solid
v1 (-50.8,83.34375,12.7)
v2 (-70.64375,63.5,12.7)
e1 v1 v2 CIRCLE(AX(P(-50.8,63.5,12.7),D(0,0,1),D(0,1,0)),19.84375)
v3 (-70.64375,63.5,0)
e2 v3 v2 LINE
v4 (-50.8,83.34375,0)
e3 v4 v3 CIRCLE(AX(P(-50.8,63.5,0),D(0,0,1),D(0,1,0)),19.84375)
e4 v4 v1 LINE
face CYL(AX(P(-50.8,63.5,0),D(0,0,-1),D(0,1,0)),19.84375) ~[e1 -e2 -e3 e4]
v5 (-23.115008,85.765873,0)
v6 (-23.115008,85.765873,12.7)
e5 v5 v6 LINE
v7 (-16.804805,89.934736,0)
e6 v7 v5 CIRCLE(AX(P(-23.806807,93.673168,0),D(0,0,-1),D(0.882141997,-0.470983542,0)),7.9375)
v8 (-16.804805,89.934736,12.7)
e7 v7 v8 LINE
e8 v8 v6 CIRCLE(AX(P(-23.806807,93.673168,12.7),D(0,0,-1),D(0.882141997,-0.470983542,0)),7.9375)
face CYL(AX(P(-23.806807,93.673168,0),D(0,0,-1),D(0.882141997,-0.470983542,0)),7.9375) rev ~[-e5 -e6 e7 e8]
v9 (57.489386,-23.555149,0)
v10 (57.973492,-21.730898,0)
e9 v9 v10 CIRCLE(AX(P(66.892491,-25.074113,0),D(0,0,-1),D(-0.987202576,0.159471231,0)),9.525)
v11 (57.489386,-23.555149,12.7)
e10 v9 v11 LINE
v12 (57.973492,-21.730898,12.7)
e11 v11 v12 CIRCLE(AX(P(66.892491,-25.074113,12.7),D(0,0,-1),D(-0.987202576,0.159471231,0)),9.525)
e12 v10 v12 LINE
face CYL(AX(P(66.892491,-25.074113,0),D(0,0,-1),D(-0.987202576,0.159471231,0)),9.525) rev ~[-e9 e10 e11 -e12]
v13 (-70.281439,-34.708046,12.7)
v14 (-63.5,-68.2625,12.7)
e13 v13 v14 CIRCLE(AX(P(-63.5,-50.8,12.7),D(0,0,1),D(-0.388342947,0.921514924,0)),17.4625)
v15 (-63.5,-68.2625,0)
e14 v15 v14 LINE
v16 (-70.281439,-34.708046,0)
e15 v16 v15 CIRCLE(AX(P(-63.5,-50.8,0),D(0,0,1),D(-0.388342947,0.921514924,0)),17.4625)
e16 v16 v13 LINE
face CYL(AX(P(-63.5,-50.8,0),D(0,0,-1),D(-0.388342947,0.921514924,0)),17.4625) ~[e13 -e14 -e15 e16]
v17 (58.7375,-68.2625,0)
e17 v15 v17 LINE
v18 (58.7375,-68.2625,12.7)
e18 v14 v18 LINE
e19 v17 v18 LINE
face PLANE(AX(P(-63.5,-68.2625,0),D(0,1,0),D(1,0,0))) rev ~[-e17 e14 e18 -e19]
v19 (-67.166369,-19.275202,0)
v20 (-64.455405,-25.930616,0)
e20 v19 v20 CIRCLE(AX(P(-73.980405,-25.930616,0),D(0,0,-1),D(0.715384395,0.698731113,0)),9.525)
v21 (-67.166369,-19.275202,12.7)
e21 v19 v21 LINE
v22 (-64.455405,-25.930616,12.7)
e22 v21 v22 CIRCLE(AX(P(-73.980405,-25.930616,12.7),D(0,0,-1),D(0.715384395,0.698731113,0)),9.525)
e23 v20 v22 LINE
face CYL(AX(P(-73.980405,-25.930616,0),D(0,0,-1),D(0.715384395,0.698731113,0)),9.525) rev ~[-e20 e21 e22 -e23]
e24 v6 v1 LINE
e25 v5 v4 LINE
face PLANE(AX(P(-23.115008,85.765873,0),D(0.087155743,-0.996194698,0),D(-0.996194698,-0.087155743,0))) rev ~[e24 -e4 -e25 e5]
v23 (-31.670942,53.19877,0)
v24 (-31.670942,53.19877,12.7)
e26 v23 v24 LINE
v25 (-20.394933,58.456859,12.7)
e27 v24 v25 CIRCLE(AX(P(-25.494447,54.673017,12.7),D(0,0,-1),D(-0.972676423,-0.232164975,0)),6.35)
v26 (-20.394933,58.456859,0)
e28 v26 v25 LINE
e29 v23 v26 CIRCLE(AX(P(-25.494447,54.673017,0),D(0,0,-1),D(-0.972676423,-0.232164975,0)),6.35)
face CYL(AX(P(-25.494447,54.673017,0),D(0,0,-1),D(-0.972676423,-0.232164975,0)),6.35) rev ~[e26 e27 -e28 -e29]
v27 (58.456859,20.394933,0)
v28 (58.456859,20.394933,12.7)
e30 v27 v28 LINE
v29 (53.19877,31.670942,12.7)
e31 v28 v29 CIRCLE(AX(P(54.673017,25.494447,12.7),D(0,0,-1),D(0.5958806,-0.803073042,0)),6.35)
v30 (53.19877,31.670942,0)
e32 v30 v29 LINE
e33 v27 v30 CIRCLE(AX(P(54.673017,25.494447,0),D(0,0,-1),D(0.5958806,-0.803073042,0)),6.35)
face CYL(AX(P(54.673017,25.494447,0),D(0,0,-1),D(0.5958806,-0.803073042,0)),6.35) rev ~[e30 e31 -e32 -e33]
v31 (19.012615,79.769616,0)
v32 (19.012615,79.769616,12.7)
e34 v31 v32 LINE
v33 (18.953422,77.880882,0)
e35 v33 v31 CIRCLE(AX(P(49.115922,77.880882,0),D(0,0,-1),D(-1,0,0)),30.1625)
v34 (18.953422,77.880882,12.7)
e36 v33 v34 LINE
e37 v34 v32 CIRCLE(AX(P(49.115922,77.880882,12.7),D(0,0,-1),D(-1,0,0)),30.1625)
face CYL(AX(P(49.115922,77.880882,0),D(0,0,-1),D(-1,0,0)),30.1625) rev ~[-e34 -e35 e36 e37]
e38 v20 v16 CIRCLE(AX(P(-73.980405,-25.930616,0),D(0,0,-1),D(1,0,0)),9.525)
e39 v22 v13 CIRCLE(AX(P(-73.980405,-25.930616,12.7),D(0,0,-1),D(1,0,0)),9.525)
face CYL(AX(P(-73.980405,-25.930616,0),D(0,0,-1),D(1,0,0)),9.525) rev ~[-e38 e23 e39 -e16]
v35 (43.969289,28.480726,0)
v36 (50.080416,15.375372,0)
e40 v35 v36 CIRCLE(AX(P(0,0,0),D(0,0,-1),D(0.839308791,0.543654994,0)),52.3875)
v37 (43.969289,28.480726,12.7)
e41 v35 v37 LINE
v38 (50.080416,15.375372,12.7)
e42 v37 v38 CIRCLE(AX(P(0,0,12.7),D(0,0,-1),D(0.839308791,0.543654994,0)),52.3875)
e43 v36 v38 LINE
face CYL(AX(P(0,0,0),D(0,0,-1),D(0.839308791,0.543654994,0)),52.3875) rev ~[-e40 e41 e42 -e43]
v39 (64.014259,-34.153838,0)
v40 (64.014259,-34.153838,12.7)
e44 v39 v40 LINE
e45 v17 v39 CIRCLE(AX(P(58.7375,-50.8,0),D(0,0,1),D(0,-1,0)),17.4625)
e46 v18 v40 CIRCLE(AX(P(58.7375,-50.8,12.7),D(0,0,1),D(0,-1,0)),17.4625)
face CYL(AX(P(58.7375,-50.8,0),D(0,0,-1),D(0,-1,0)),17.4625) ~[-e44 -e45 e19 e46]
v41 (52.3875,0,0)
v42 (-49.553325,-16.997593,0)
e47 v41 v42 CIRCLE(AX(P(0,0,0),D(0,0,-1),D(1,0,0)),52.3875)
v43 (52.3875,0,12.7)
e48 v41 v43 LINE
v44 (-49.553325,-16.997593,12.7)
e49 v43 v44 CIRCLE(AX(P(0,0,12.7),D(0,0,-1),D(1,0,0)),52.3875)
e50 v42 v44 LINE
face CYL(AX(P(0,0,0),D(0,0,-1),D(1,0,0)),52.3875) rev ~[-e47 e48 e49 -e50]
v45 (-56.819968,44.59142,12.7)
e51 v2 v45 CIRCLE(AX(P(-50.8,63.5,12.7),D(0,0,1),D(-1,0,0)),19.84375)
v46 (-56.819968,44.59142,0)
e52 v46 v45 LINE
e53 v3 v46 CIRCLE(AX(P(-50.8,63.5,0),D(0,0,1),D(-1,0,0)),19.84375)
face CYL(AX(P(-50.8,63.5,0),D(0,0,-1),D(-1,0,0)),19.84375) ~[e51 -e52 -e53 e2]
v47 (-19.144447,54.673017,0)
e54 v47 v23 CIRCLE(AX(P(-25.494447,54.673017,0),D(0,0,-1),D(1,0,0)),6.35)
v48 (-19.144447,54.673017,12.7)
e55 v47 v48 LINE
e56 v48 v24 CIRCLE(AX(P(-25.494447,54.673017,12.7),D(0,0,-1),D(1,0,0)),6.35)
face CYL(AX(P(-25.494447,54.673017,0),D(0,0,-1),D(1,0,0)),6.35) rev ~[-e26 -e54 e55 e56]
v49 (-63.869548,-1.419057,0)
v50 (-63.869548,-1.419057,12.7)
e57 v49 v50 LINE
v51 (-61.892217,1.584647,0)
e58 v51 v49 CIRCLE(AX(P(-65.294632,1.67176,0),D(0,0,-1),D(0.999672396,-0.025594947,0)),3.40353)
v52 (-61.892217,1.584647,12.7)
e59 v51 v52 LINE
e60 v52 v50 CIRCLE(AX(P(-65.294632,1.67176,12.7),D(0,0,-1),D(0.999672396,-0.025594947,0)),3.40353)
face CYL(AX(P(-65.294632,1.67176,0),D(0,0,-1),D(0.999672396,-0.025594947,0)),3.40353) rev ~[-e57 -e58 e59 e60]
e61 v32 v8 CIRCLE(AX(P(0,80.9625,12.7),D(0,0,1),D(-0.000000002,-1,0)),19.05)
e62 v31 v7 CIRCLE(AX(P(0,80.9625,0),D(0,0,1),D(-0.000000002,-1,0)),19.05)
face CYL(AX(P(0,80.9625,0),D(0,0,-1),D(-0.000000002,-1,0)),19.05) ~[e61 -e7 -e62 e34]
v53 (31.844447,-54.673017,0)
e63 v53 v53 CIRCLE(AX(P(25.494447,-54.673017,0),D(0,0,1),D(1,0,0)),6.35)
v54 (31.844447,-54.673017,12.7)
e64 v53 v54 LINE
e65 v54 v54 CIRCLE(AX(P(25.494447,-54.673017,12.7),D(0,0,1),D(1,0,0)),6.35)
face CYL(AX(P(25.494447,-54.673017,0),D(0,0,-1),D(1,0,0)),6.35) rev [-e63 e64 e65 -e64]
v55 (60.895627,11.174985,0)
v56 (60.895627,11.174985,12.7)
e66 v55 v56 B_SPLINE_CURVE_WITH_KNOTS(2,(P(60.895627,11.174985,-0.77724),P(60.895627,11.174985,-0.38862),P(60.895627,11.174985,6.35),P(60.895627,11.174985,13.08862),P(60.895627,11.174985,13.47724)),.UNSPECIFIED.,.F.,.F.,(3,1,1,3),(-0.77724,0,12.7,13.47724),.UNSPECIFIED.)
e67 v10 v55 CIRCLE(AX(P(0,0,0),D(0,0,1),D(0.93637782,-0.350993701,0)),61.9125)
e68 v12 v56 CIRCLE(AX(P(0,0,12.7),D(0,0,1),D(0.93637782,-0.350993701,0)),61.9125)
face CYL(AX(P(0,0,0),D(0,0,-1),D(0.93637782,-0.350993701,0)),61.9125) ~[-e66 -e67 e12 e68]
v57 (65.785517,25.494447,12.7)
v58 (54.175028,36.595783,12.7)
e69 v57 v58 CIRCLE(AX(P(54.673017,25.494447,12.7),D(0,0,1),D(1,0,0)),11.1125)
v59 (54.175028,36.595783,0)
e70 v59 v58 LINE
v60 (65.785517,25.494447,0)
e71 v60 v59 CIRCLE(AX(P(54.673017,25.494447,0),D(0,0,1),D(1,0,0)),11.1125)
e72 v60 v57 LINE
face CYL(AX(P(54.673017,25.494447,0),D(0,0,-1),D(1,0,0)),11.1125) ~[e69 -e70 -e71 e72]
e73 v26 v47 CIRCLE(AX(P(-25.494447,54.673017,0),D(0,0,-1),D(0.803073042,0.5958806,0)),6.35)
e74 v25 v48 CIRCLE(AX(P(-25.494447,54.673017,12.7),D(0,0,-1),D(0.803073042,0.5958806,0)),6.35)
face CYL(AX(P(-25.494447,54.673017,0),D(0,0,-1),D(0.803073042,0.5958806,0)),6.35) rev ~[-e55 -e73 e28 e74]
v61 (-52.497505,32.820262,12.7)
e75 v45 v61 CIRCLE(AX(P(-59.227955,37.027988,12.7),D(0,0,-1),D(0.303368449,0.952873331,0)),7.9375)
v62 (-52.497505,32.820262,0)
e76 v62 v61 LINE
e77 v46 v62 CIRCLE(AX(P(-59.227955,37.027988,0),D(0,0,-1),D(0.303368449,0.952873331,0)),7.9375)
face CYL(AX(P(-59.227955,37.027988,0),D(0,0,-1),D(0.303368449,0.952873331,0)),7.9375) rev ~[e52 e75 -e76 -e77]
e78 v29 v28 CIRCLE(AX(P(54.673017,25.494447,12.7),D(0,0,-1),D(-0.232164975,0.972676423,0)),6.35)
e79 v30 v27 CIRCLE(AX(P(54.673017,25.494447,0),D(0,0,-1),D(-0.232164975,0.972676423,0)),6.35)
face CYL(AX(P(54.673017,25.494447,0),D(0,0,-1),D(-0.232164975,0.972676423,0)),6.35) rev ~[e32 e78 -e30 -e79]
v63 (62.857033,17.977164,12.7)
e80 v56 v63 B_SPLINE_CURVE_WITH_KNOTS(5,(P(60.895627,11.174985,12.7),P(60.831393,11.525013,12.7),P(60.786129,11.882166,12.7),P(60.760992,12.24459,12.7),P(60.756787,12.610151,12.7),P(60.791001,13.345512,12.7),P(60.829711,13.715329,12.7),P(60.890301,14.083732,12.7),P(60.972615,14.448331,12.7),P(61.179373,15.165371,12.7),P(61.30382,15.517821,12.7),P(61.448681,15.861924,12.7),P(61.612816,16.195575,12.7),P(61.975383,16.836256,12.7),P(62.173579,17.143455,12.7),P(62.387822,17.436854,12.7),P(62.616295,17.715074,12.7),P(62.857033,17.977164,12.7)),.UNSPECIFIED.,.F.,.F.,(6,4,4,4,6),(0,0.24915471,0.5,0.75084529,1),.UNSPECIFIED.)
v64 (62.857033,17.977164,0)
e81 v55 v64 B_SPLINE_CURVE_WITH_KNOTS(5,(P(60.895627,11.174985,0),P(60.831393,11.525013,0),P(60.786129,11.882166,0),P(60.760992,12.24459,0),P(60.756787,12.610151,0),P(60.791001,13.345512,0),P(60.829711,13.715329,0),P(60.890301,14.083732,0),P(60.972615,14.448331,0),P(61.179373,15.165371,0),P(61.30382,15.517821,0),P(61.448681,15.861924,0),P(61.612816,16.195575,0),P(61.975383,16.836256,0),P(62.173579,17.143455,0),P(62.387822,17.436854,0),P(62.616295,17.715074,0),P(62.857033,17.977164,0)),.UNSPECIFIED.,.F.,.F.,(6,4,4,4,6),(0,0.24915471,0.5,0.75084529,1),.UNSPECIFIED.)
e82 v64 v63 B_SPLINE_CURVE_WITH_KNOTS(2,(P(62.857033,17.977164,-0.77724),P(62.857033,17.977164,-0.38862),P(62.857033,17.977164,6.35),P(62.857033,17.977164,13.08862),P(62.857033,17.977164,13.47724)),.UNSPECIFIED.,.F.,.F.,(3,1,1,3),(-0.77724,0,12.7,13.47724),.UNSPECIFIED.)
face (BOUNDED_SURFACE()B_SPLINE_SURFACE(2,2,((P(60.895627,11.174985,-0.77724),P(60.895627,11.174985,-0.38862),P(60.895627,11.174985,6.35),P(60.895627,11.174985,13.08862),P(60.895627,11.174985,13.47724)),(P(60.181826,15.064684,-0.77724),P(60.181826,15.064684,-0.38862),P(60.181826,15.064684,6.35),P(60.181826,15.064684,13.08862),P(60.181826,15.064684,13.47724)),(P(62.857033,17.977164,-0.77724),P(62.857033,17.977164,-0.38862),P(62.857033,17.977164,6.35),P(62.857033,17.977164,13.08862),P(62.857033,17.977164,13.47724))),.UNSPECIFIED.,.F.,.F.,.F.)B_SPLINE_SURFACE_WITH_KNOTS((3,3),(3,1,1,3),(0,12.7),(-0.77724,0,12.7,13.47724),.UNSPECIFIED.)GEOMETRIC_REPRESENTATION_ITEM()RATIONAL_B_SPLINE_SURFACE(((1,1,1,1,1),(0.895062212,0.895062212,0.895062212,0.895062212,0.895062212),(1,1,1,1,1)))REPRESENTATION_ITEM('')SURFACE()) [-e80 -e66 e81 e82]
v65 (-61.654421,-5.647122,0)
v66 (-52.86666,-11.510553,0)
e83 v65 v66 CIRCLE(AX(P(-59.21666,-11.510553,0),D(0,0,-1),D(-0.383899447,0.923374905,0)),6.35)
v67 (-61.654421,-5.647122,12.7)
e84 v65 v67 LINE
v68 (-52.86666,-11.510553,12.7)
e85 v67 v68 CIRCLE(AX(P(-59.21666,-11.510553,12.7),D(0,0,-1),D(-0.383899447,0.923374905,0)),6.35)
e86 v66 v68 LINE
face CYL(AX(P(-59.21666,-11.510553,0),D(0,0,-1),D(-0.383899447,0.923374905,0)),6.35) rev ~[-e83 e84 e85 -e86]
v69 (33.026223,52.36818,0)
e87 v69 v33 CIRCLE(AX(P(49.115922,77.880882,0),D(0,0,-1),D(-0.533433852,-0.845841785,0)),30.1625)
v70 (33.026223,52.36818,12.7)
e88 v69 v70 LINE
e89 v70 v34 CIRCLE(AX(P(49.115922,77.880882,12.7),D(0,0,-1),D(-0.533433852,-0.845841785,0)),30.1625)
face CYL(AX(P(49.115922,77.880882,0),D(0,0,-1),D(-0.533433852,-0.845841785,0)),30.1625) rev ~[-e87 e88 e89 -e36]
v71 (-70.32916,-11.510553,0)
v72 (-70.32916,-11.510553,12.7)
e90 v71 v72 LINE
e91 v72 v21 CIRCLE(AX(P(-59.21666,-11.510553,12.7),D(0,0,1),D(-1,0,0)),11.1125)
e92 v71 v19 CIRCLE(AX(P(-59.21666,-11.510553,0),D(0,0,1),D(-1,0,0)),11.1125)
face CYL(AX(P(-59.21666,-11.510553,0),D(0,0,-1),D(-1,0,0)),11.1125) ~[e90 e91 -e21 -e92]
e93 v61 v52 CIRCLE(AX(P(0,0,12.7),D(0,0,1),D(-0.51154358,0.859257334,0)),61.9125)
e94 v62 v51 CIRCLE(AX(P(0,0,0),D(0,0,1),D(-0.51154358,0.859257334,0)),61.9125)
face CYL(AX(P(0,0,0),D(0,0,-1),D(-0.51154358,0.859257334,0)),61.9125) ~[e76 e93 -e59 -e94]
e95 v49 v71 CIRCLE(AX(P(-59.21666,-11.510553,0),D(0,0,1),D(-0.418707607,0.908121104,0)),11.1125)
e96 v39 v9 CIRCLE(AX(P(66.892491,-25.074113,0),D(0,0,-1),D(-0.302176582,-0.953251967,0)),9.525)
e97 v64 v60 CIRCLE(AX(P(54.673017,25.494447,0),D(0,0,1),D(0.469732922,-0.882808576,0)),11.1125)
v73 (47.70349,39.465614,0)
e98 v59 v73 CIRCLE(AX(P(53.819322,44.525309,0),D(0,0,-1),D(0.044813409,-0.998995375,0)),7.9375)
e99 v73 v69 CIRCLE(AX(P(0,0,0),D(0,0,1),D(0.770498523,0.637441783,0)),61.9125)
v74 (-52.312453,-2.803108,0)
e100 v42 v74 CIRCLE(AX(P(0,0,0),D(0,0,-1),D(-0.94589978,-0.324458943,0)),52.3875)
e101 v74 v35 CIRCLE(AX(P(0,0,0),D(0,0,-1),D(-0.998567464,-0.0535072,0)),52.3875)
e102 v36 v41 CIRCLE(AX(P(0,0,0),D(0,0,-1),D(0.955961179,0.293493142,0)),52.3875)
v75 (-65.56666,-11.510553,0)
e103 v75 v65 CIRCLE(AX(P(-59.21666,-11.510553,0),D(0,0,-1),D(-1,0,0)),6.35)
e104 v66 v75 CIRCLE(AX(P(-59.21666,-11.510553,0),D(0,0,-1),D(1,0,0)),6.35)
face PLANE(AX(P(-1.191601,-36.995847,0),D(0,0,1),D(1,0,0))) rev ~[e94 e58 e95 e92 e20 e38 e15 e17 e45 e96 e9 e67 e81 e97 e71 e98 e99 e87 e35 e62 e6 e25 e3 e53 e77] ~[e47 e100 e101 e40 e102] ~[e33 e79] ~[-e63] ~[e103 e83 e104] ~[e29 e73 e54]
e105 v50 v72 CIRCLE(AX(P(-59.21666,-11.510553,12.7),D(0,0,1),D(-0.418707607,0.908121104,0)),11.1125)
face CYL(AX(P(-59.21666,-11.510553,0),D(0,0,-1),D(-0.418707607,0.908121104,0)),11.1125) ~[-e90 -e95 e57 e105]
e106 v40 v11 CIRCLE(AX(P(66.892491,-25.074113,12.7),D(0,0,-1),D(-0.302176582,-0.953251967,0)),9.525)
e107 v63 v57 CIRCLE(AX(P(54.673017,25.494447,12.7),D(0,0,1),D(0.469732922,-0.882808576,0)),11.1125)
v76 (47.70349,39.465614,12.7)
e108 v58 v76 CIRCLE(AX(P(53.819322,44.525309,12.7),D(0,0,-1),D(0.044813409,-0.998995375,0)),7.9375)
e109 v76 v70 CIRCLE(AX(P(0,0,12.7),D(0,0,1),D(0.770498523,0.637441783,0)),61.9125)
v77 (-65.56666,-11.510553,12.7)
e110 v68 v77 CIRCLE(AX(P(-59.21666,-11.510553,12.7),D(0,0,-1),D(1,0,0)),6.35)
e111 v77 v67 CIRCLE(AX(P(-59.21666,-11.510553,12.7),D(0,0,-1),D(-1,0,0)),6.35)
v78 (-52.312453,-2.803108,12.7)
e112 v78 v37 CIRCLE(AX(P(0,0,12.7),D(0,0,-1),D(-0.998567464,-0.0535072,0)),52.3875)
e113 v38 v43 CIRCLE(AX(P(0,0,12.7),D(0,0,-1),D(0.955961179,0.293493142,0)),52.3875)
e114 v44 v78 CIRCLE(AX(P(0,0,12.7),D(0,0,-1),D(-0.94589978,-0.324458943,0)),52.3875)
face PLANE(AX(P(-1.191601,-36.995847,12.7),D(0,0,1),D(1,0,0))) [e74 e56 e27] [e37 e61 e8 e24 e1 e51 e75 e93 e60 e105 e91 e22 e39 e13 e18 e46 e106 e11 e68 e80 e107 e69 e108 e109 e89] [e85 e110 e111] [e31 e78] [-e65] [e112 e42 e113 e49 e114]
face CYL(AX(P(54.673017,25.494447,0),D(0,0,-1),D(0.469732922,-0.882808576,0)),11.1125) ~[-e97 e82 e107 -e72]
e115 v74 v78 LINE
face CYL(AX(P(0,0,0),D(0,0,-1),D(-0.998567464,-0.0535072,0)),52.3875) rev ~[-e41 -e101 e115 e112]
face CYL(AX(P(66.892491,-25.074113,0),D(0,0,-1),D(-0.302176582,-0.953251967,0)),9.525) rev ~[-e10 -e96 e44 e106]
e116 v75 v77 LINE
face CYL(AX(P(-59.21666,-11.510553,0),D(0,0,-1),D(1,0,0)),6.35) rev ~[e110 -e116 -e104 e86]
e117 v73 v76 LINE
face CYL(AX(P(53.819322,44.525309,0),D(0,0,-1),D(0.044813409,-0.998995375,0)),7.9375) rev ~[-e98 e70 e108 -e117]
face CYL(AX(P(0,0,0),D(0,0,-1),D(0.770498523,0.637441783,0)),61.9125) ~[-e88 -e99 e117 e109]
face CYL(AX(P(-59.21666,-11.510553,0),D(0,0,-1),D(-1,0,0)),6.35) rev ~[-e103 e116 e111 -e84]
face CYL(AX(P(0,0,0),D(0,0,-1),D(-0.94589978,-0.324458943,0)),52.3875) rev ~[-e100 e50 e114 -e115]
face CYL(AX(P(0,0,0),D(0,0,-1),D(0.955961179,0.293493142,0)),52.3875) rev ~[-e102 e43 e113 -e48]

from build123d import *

# Parameters (mm, degrees)
F0_R     = 6.35
F1_DEPTH = 12.7
F2_R     = 7.9375


with BuildPart() as f1:
    # F0 (on Top) → F1 (new body)
    with BuildSketch(Plane.XY):
        with BuildLine():
            ThreePointArc((50.0804162666, 15.375371957), (51.8075185828, 7.7737490661), (52.3875, 0))
            ThreePointArc((52.3875, 0), (8.6161289731, -51.6740987127), (-49.5533247299, -16.9975929021))
            ThreePointArc((-49.5533247299, -16.9975929021), (-51.4249940729, -9.9960062453), (-52.312453003, -2.8031084642))
            ThreePointArc((-52.312453003, -2.8031084642), (-56.8688591942, -0.6489004527), (-61.9082087133, -0.7289376965))
            ThreePointArc((-61.9082087133, -0.7289376965), (-61.8302354833, -3.1905542348), (-61.6544213285, -5.6471220008))
            ThreePointArc((-61.6544213285, -5.6471220008), (-55.692265244, -6.2283994183), (-52.8666598415, -11.5105526461))
            ThreePointArc((-52.8666598415, -11.5105526461), (-59.2166598415, -17.8605526461), (-65.5666598415, -11.5105526461))
            Line((-65.5666598415, -11.5105526461), (-70.3291598415, -11.5105526461))
            ThreePointArc((-70.3291598415, -11.5105526461), (-69.508132002, -15.702599523), (-67.166368927, -19.2752021362))
            ThreePointArc((-67.166368927, -19.2752021362), (-65.1591434342, -22.3374329476), (-64.4554052861, -25.9306159849))
            ThreePointArc((-64.4554052861, -25.9306159849), (-66.044465468, -31.1981091461), (-70.2814387145, -34.7080456373))
            ThreePointArc((-70.2814387145, -34.7080456373), (-80.6164344901, -54.2592739984), (-63.5, -68.2625))
            Line((-63.5, -68.2625), (0, -68.2625))
            Line((0, -68.2625), (58.7375, -68.2625))
            ThreePointArc((58.7375, -68.2625), (75.9947089073, -53.4697653418), (64.0142585669, -34.153837521))
            ThreePointArc((64.0142585669, -34.153837521), (58.7813342607, -30.0675851979), (57.4893859738, -23.5551490588))
            ThreePointArc((57.4893859738, -23.5551490588), (57.686142675, -22.631002937), (57.9734917775, -21.7308975281))
            ThreePointArc((57.9734917775, -21.7308975281), (61.831190131, -3.1719998798), (59.8929243466, 15.6842363367))
            ThreePointArc((59.8929243466, 15.6842363367), (55.0226278067, 14.3874475529), (50.0804162666, 15.375371957))
        make_face()
        with Locations((25.4944466395, -54.673017253)):
            Circle(F0_R, mode=Mode.SUBTRACT)
        with BuildLine():
            ThreePointArc((43.9692893127, 28.4807260018), (47.4791991934, 22.1399141869), (50.0804162666, 15.375371957))
            ThreePointArc((50.0804162666, 15.375371957), (55.0226278067, 14.3874475529), (59.8929243466, 15.6842363367))
            ThreePointArc((59.8929243466, 15.6842363367), (59.2217483156, 18.053868912), (58.456859062, 20.394932823))
            ThreePointArc((58.456859062, 20.394932823), (48.9179628053, 22.8108206775), (53.1987696631, 31.6709419276))
            ThreePointArc((53.1987696631, 31.6709419276), (51.8970719981, 33.7616879655), (50.5132517682, 35.7990090932))
            ThreePointArc((50.5132517682, 35.7990090932), (46.3892876551, 32.9017052551), (43.9692893127, 28.4807260018))
        make_face()
        with BuildLine():
            ThreePointArc((-52.312453003, -2.8031084642), (-16.1886277928, 49.8234732474), (43.9692893127, 28.4807260018))
            ThreePointArc((43.9692893127, 28.4807260018), (46.3892876551, 32.9017052551), (50.5132517682, 35.7990090932))
            ThreePointArc((50.5132517682, 35.7990090932), (52.310310906, 36.3528661823), (54.1750282482, 36.5957827393))
            ThreePointArc((54.1750282482, 36.5957827393), (50.6015982243, 37.2692654479), (47.7034897917, 39.4656143744))
            ThreePointArc((47.7034897917, 39.4656143744), (40.8771414604, 46.4996447543), (33.0262233797, 52.3681795132))
            ThreePointArc((33.0262233797, 52.3681795132), (17.1888443577, 59.4785783783), (-4.35e-08, 61.9125))
            ThreePointArc((-4.35e-08, 61.9125), (-10.3428083822, 61.0424767766), (-20.394932823, 58.456859062))
            ThreePointArc((-20.394932823, 58.456859062), (-19.4651675477, 56.6655768212), (-19.1444466395, 54.673017253))
            ThreePointArc((-19.1444466395, 54.673017253), (-24.7522354429, 48.3665426007), (-31.6709419276, 53.1987696631))
            ThreePointArc((-31.6709419276, 53.1987696631), (-43.3001474916, 44.252173771), (-52.4975053225, 32.8202618997))
            ThreePointArc((-52.4975053225, 32.8202618997), (-59.2888527637, 17.8322627339), (-61.8922171982, 1.5846471339))
            ThreePointArc((-61.8922171982, 1.5846471339), (-62.4517909232, -0.1996749025), (-63.8695481256, -1.4190568766))
            ThreePointArc((-63.8695481256, -1.4190568766), (-68.5759567517, -5.5196247049), (-70.3291598415, -11.5105526461))
            Line((-70.3291598415, -11.5105526461), (-65.5666598415, -11.5105526461))
            ThreePointArc((-65.5666598415, -11.5105526461), (-64.4988130692, -7.9861580486), (-61.6544213285, -5.6471220008))
            ThreePointArc((-61.6544213285, -5.6471220008), (-61.8302354833, -3.1905542348), (-61.9082087133, -0.7289376965))
            ThreePointArc((-61.9082087133, -0.7289376965), (-56.8688591942, -0.6489004527), (-52.312453003, -2.8031084642))
        make_face()
        with BuildLine():
            ThreePointArc((58.456859062, 20.394932823), (59.2217483156, 18.053868912), (59.8929243466, 15.6842363367))
            ThreePointArc((59.8929243466, 15.6842363367), (64.1991359229, 19.7724959812), (65.785517253, 25.4944466395))
            ThreePointArc((65.785517253, 25.4944466395), (62.3526576558, 33.526306918), (54.1750282482, 36.5957827393))
            ThreePointArc((54.1750282482, 36.5957827393), (52.310310906, 36.3528661823), (50.5132517682, 35.7990090932))
            ThreePointArc((50.5132517682, 35.7990090932), (51.8970719981, 33.7616879655), (53.1987696631, 31.6709419276))
            ThreePointArc((53.1987696631, 31.6709419276), (58.6075456748, 30.4786202017), (61.023017253, 25.4944466395))
            ThreePointArc((61.023017253, 25.4944466395), (60.3453137671, 22.6400548906), (58.456859062, 20.394932823))
        make_face()
        with BuildLine():
            ThreePointArc((-4.35e-08, 61.9125), (17.1888443577, 59.4785783783), (33.0262233797, 52.3681795132))
            ThreePointArc((33.0262233797, 52.3681795132), (22.7049210277, 63.3125798927), (18.9534219493, 77.8808823529))
            ThreePointArc((18.9534219493, 77.8808823529), (18.9682238309, 78.8257127153), (19.0126149481, 79.7696157495))
            ThreePointArc((19.0126149481, 79.7696157495), (13.041818397, 67.0767708906), (-4.35e-08, 61.9125))
        make_face()
        with BuildLine():
            ThreePointArc((-20.394932823, 58.456859062), (-10.3428083822, 61.0424767766), (-4.35e-08, 61.9125))
            ThreePointArc((-4.35e-08, 61.9125), (-3.8885649879, 62.3135975568), (-7.6133825433, 63.5))
            Line((-7.6133825433, 63.5), (-50.8, 63.5))
            Line((-50.8, 63.5), (-70.64375, 63.5))
            ThreePointArc((-70.64375, 63.5), (-66.8192563388, 51.788559422), (-56.8199676592, 44.5914198459))
            ThreePointArc((-56.8199676592, 44.5914198459), (-51.7769282768, 39.7640636512), (-52.4975053225, 32.8202618997))
            ThreePointArc((-52.4975053225, 32.8202618997), (-43.3001474916, 44.252173771), (-31.6709419276, 53.1987696631))
            ThreePointArc((-31.6709419276, 53.1987696631), (-28.1780726016, 60.4280717007), (-20.394932823, 58.456859062))
        make_face()
        with BuildLine():
            ThreePointArc((-7.6133825433, 63.5), (-3.8885649879, 62.3135975568), (-4.35e-08, 61.9125))
            ThreePointArc((-4.35e-08, 61.9125), (13.041818397, 67.0767708906), (19.0126149481, 79.7696157495))
            ThreePointArc((19.0126149481, 79.7696157495), (5.2010600776, 99.2887509551), (-16.8048050509, 89.934736466))
            ThreePointArc((-16.8048050509, 89.934736466), (-19.4314787596, 87.050449272), (-23.1150084474, 85.7658729107))
            Line((-23.1150084474, 85.7658729107), (-50.8, 83.34375))
            ThreePointArc((-50.8, 83.34375), (-64.8316501892, 77.5316501892), (-70.64375, 63.5))
            Line((-70.64375, 63.5), (-50.8, 63.5))
            Line((-50.8, 63.5), (-7.6133825433, 63.5))
        make_face()
    extrude(amount=F1_DEPTH)

    # F2
    f2_edges = [f1.edges().sort_by_distance(p)[0] for p in [
        (59.892924, 15.684236, 6.35),
    ]]
    fillet(f2_edges, radius=F2_R)


solid = f1.part
